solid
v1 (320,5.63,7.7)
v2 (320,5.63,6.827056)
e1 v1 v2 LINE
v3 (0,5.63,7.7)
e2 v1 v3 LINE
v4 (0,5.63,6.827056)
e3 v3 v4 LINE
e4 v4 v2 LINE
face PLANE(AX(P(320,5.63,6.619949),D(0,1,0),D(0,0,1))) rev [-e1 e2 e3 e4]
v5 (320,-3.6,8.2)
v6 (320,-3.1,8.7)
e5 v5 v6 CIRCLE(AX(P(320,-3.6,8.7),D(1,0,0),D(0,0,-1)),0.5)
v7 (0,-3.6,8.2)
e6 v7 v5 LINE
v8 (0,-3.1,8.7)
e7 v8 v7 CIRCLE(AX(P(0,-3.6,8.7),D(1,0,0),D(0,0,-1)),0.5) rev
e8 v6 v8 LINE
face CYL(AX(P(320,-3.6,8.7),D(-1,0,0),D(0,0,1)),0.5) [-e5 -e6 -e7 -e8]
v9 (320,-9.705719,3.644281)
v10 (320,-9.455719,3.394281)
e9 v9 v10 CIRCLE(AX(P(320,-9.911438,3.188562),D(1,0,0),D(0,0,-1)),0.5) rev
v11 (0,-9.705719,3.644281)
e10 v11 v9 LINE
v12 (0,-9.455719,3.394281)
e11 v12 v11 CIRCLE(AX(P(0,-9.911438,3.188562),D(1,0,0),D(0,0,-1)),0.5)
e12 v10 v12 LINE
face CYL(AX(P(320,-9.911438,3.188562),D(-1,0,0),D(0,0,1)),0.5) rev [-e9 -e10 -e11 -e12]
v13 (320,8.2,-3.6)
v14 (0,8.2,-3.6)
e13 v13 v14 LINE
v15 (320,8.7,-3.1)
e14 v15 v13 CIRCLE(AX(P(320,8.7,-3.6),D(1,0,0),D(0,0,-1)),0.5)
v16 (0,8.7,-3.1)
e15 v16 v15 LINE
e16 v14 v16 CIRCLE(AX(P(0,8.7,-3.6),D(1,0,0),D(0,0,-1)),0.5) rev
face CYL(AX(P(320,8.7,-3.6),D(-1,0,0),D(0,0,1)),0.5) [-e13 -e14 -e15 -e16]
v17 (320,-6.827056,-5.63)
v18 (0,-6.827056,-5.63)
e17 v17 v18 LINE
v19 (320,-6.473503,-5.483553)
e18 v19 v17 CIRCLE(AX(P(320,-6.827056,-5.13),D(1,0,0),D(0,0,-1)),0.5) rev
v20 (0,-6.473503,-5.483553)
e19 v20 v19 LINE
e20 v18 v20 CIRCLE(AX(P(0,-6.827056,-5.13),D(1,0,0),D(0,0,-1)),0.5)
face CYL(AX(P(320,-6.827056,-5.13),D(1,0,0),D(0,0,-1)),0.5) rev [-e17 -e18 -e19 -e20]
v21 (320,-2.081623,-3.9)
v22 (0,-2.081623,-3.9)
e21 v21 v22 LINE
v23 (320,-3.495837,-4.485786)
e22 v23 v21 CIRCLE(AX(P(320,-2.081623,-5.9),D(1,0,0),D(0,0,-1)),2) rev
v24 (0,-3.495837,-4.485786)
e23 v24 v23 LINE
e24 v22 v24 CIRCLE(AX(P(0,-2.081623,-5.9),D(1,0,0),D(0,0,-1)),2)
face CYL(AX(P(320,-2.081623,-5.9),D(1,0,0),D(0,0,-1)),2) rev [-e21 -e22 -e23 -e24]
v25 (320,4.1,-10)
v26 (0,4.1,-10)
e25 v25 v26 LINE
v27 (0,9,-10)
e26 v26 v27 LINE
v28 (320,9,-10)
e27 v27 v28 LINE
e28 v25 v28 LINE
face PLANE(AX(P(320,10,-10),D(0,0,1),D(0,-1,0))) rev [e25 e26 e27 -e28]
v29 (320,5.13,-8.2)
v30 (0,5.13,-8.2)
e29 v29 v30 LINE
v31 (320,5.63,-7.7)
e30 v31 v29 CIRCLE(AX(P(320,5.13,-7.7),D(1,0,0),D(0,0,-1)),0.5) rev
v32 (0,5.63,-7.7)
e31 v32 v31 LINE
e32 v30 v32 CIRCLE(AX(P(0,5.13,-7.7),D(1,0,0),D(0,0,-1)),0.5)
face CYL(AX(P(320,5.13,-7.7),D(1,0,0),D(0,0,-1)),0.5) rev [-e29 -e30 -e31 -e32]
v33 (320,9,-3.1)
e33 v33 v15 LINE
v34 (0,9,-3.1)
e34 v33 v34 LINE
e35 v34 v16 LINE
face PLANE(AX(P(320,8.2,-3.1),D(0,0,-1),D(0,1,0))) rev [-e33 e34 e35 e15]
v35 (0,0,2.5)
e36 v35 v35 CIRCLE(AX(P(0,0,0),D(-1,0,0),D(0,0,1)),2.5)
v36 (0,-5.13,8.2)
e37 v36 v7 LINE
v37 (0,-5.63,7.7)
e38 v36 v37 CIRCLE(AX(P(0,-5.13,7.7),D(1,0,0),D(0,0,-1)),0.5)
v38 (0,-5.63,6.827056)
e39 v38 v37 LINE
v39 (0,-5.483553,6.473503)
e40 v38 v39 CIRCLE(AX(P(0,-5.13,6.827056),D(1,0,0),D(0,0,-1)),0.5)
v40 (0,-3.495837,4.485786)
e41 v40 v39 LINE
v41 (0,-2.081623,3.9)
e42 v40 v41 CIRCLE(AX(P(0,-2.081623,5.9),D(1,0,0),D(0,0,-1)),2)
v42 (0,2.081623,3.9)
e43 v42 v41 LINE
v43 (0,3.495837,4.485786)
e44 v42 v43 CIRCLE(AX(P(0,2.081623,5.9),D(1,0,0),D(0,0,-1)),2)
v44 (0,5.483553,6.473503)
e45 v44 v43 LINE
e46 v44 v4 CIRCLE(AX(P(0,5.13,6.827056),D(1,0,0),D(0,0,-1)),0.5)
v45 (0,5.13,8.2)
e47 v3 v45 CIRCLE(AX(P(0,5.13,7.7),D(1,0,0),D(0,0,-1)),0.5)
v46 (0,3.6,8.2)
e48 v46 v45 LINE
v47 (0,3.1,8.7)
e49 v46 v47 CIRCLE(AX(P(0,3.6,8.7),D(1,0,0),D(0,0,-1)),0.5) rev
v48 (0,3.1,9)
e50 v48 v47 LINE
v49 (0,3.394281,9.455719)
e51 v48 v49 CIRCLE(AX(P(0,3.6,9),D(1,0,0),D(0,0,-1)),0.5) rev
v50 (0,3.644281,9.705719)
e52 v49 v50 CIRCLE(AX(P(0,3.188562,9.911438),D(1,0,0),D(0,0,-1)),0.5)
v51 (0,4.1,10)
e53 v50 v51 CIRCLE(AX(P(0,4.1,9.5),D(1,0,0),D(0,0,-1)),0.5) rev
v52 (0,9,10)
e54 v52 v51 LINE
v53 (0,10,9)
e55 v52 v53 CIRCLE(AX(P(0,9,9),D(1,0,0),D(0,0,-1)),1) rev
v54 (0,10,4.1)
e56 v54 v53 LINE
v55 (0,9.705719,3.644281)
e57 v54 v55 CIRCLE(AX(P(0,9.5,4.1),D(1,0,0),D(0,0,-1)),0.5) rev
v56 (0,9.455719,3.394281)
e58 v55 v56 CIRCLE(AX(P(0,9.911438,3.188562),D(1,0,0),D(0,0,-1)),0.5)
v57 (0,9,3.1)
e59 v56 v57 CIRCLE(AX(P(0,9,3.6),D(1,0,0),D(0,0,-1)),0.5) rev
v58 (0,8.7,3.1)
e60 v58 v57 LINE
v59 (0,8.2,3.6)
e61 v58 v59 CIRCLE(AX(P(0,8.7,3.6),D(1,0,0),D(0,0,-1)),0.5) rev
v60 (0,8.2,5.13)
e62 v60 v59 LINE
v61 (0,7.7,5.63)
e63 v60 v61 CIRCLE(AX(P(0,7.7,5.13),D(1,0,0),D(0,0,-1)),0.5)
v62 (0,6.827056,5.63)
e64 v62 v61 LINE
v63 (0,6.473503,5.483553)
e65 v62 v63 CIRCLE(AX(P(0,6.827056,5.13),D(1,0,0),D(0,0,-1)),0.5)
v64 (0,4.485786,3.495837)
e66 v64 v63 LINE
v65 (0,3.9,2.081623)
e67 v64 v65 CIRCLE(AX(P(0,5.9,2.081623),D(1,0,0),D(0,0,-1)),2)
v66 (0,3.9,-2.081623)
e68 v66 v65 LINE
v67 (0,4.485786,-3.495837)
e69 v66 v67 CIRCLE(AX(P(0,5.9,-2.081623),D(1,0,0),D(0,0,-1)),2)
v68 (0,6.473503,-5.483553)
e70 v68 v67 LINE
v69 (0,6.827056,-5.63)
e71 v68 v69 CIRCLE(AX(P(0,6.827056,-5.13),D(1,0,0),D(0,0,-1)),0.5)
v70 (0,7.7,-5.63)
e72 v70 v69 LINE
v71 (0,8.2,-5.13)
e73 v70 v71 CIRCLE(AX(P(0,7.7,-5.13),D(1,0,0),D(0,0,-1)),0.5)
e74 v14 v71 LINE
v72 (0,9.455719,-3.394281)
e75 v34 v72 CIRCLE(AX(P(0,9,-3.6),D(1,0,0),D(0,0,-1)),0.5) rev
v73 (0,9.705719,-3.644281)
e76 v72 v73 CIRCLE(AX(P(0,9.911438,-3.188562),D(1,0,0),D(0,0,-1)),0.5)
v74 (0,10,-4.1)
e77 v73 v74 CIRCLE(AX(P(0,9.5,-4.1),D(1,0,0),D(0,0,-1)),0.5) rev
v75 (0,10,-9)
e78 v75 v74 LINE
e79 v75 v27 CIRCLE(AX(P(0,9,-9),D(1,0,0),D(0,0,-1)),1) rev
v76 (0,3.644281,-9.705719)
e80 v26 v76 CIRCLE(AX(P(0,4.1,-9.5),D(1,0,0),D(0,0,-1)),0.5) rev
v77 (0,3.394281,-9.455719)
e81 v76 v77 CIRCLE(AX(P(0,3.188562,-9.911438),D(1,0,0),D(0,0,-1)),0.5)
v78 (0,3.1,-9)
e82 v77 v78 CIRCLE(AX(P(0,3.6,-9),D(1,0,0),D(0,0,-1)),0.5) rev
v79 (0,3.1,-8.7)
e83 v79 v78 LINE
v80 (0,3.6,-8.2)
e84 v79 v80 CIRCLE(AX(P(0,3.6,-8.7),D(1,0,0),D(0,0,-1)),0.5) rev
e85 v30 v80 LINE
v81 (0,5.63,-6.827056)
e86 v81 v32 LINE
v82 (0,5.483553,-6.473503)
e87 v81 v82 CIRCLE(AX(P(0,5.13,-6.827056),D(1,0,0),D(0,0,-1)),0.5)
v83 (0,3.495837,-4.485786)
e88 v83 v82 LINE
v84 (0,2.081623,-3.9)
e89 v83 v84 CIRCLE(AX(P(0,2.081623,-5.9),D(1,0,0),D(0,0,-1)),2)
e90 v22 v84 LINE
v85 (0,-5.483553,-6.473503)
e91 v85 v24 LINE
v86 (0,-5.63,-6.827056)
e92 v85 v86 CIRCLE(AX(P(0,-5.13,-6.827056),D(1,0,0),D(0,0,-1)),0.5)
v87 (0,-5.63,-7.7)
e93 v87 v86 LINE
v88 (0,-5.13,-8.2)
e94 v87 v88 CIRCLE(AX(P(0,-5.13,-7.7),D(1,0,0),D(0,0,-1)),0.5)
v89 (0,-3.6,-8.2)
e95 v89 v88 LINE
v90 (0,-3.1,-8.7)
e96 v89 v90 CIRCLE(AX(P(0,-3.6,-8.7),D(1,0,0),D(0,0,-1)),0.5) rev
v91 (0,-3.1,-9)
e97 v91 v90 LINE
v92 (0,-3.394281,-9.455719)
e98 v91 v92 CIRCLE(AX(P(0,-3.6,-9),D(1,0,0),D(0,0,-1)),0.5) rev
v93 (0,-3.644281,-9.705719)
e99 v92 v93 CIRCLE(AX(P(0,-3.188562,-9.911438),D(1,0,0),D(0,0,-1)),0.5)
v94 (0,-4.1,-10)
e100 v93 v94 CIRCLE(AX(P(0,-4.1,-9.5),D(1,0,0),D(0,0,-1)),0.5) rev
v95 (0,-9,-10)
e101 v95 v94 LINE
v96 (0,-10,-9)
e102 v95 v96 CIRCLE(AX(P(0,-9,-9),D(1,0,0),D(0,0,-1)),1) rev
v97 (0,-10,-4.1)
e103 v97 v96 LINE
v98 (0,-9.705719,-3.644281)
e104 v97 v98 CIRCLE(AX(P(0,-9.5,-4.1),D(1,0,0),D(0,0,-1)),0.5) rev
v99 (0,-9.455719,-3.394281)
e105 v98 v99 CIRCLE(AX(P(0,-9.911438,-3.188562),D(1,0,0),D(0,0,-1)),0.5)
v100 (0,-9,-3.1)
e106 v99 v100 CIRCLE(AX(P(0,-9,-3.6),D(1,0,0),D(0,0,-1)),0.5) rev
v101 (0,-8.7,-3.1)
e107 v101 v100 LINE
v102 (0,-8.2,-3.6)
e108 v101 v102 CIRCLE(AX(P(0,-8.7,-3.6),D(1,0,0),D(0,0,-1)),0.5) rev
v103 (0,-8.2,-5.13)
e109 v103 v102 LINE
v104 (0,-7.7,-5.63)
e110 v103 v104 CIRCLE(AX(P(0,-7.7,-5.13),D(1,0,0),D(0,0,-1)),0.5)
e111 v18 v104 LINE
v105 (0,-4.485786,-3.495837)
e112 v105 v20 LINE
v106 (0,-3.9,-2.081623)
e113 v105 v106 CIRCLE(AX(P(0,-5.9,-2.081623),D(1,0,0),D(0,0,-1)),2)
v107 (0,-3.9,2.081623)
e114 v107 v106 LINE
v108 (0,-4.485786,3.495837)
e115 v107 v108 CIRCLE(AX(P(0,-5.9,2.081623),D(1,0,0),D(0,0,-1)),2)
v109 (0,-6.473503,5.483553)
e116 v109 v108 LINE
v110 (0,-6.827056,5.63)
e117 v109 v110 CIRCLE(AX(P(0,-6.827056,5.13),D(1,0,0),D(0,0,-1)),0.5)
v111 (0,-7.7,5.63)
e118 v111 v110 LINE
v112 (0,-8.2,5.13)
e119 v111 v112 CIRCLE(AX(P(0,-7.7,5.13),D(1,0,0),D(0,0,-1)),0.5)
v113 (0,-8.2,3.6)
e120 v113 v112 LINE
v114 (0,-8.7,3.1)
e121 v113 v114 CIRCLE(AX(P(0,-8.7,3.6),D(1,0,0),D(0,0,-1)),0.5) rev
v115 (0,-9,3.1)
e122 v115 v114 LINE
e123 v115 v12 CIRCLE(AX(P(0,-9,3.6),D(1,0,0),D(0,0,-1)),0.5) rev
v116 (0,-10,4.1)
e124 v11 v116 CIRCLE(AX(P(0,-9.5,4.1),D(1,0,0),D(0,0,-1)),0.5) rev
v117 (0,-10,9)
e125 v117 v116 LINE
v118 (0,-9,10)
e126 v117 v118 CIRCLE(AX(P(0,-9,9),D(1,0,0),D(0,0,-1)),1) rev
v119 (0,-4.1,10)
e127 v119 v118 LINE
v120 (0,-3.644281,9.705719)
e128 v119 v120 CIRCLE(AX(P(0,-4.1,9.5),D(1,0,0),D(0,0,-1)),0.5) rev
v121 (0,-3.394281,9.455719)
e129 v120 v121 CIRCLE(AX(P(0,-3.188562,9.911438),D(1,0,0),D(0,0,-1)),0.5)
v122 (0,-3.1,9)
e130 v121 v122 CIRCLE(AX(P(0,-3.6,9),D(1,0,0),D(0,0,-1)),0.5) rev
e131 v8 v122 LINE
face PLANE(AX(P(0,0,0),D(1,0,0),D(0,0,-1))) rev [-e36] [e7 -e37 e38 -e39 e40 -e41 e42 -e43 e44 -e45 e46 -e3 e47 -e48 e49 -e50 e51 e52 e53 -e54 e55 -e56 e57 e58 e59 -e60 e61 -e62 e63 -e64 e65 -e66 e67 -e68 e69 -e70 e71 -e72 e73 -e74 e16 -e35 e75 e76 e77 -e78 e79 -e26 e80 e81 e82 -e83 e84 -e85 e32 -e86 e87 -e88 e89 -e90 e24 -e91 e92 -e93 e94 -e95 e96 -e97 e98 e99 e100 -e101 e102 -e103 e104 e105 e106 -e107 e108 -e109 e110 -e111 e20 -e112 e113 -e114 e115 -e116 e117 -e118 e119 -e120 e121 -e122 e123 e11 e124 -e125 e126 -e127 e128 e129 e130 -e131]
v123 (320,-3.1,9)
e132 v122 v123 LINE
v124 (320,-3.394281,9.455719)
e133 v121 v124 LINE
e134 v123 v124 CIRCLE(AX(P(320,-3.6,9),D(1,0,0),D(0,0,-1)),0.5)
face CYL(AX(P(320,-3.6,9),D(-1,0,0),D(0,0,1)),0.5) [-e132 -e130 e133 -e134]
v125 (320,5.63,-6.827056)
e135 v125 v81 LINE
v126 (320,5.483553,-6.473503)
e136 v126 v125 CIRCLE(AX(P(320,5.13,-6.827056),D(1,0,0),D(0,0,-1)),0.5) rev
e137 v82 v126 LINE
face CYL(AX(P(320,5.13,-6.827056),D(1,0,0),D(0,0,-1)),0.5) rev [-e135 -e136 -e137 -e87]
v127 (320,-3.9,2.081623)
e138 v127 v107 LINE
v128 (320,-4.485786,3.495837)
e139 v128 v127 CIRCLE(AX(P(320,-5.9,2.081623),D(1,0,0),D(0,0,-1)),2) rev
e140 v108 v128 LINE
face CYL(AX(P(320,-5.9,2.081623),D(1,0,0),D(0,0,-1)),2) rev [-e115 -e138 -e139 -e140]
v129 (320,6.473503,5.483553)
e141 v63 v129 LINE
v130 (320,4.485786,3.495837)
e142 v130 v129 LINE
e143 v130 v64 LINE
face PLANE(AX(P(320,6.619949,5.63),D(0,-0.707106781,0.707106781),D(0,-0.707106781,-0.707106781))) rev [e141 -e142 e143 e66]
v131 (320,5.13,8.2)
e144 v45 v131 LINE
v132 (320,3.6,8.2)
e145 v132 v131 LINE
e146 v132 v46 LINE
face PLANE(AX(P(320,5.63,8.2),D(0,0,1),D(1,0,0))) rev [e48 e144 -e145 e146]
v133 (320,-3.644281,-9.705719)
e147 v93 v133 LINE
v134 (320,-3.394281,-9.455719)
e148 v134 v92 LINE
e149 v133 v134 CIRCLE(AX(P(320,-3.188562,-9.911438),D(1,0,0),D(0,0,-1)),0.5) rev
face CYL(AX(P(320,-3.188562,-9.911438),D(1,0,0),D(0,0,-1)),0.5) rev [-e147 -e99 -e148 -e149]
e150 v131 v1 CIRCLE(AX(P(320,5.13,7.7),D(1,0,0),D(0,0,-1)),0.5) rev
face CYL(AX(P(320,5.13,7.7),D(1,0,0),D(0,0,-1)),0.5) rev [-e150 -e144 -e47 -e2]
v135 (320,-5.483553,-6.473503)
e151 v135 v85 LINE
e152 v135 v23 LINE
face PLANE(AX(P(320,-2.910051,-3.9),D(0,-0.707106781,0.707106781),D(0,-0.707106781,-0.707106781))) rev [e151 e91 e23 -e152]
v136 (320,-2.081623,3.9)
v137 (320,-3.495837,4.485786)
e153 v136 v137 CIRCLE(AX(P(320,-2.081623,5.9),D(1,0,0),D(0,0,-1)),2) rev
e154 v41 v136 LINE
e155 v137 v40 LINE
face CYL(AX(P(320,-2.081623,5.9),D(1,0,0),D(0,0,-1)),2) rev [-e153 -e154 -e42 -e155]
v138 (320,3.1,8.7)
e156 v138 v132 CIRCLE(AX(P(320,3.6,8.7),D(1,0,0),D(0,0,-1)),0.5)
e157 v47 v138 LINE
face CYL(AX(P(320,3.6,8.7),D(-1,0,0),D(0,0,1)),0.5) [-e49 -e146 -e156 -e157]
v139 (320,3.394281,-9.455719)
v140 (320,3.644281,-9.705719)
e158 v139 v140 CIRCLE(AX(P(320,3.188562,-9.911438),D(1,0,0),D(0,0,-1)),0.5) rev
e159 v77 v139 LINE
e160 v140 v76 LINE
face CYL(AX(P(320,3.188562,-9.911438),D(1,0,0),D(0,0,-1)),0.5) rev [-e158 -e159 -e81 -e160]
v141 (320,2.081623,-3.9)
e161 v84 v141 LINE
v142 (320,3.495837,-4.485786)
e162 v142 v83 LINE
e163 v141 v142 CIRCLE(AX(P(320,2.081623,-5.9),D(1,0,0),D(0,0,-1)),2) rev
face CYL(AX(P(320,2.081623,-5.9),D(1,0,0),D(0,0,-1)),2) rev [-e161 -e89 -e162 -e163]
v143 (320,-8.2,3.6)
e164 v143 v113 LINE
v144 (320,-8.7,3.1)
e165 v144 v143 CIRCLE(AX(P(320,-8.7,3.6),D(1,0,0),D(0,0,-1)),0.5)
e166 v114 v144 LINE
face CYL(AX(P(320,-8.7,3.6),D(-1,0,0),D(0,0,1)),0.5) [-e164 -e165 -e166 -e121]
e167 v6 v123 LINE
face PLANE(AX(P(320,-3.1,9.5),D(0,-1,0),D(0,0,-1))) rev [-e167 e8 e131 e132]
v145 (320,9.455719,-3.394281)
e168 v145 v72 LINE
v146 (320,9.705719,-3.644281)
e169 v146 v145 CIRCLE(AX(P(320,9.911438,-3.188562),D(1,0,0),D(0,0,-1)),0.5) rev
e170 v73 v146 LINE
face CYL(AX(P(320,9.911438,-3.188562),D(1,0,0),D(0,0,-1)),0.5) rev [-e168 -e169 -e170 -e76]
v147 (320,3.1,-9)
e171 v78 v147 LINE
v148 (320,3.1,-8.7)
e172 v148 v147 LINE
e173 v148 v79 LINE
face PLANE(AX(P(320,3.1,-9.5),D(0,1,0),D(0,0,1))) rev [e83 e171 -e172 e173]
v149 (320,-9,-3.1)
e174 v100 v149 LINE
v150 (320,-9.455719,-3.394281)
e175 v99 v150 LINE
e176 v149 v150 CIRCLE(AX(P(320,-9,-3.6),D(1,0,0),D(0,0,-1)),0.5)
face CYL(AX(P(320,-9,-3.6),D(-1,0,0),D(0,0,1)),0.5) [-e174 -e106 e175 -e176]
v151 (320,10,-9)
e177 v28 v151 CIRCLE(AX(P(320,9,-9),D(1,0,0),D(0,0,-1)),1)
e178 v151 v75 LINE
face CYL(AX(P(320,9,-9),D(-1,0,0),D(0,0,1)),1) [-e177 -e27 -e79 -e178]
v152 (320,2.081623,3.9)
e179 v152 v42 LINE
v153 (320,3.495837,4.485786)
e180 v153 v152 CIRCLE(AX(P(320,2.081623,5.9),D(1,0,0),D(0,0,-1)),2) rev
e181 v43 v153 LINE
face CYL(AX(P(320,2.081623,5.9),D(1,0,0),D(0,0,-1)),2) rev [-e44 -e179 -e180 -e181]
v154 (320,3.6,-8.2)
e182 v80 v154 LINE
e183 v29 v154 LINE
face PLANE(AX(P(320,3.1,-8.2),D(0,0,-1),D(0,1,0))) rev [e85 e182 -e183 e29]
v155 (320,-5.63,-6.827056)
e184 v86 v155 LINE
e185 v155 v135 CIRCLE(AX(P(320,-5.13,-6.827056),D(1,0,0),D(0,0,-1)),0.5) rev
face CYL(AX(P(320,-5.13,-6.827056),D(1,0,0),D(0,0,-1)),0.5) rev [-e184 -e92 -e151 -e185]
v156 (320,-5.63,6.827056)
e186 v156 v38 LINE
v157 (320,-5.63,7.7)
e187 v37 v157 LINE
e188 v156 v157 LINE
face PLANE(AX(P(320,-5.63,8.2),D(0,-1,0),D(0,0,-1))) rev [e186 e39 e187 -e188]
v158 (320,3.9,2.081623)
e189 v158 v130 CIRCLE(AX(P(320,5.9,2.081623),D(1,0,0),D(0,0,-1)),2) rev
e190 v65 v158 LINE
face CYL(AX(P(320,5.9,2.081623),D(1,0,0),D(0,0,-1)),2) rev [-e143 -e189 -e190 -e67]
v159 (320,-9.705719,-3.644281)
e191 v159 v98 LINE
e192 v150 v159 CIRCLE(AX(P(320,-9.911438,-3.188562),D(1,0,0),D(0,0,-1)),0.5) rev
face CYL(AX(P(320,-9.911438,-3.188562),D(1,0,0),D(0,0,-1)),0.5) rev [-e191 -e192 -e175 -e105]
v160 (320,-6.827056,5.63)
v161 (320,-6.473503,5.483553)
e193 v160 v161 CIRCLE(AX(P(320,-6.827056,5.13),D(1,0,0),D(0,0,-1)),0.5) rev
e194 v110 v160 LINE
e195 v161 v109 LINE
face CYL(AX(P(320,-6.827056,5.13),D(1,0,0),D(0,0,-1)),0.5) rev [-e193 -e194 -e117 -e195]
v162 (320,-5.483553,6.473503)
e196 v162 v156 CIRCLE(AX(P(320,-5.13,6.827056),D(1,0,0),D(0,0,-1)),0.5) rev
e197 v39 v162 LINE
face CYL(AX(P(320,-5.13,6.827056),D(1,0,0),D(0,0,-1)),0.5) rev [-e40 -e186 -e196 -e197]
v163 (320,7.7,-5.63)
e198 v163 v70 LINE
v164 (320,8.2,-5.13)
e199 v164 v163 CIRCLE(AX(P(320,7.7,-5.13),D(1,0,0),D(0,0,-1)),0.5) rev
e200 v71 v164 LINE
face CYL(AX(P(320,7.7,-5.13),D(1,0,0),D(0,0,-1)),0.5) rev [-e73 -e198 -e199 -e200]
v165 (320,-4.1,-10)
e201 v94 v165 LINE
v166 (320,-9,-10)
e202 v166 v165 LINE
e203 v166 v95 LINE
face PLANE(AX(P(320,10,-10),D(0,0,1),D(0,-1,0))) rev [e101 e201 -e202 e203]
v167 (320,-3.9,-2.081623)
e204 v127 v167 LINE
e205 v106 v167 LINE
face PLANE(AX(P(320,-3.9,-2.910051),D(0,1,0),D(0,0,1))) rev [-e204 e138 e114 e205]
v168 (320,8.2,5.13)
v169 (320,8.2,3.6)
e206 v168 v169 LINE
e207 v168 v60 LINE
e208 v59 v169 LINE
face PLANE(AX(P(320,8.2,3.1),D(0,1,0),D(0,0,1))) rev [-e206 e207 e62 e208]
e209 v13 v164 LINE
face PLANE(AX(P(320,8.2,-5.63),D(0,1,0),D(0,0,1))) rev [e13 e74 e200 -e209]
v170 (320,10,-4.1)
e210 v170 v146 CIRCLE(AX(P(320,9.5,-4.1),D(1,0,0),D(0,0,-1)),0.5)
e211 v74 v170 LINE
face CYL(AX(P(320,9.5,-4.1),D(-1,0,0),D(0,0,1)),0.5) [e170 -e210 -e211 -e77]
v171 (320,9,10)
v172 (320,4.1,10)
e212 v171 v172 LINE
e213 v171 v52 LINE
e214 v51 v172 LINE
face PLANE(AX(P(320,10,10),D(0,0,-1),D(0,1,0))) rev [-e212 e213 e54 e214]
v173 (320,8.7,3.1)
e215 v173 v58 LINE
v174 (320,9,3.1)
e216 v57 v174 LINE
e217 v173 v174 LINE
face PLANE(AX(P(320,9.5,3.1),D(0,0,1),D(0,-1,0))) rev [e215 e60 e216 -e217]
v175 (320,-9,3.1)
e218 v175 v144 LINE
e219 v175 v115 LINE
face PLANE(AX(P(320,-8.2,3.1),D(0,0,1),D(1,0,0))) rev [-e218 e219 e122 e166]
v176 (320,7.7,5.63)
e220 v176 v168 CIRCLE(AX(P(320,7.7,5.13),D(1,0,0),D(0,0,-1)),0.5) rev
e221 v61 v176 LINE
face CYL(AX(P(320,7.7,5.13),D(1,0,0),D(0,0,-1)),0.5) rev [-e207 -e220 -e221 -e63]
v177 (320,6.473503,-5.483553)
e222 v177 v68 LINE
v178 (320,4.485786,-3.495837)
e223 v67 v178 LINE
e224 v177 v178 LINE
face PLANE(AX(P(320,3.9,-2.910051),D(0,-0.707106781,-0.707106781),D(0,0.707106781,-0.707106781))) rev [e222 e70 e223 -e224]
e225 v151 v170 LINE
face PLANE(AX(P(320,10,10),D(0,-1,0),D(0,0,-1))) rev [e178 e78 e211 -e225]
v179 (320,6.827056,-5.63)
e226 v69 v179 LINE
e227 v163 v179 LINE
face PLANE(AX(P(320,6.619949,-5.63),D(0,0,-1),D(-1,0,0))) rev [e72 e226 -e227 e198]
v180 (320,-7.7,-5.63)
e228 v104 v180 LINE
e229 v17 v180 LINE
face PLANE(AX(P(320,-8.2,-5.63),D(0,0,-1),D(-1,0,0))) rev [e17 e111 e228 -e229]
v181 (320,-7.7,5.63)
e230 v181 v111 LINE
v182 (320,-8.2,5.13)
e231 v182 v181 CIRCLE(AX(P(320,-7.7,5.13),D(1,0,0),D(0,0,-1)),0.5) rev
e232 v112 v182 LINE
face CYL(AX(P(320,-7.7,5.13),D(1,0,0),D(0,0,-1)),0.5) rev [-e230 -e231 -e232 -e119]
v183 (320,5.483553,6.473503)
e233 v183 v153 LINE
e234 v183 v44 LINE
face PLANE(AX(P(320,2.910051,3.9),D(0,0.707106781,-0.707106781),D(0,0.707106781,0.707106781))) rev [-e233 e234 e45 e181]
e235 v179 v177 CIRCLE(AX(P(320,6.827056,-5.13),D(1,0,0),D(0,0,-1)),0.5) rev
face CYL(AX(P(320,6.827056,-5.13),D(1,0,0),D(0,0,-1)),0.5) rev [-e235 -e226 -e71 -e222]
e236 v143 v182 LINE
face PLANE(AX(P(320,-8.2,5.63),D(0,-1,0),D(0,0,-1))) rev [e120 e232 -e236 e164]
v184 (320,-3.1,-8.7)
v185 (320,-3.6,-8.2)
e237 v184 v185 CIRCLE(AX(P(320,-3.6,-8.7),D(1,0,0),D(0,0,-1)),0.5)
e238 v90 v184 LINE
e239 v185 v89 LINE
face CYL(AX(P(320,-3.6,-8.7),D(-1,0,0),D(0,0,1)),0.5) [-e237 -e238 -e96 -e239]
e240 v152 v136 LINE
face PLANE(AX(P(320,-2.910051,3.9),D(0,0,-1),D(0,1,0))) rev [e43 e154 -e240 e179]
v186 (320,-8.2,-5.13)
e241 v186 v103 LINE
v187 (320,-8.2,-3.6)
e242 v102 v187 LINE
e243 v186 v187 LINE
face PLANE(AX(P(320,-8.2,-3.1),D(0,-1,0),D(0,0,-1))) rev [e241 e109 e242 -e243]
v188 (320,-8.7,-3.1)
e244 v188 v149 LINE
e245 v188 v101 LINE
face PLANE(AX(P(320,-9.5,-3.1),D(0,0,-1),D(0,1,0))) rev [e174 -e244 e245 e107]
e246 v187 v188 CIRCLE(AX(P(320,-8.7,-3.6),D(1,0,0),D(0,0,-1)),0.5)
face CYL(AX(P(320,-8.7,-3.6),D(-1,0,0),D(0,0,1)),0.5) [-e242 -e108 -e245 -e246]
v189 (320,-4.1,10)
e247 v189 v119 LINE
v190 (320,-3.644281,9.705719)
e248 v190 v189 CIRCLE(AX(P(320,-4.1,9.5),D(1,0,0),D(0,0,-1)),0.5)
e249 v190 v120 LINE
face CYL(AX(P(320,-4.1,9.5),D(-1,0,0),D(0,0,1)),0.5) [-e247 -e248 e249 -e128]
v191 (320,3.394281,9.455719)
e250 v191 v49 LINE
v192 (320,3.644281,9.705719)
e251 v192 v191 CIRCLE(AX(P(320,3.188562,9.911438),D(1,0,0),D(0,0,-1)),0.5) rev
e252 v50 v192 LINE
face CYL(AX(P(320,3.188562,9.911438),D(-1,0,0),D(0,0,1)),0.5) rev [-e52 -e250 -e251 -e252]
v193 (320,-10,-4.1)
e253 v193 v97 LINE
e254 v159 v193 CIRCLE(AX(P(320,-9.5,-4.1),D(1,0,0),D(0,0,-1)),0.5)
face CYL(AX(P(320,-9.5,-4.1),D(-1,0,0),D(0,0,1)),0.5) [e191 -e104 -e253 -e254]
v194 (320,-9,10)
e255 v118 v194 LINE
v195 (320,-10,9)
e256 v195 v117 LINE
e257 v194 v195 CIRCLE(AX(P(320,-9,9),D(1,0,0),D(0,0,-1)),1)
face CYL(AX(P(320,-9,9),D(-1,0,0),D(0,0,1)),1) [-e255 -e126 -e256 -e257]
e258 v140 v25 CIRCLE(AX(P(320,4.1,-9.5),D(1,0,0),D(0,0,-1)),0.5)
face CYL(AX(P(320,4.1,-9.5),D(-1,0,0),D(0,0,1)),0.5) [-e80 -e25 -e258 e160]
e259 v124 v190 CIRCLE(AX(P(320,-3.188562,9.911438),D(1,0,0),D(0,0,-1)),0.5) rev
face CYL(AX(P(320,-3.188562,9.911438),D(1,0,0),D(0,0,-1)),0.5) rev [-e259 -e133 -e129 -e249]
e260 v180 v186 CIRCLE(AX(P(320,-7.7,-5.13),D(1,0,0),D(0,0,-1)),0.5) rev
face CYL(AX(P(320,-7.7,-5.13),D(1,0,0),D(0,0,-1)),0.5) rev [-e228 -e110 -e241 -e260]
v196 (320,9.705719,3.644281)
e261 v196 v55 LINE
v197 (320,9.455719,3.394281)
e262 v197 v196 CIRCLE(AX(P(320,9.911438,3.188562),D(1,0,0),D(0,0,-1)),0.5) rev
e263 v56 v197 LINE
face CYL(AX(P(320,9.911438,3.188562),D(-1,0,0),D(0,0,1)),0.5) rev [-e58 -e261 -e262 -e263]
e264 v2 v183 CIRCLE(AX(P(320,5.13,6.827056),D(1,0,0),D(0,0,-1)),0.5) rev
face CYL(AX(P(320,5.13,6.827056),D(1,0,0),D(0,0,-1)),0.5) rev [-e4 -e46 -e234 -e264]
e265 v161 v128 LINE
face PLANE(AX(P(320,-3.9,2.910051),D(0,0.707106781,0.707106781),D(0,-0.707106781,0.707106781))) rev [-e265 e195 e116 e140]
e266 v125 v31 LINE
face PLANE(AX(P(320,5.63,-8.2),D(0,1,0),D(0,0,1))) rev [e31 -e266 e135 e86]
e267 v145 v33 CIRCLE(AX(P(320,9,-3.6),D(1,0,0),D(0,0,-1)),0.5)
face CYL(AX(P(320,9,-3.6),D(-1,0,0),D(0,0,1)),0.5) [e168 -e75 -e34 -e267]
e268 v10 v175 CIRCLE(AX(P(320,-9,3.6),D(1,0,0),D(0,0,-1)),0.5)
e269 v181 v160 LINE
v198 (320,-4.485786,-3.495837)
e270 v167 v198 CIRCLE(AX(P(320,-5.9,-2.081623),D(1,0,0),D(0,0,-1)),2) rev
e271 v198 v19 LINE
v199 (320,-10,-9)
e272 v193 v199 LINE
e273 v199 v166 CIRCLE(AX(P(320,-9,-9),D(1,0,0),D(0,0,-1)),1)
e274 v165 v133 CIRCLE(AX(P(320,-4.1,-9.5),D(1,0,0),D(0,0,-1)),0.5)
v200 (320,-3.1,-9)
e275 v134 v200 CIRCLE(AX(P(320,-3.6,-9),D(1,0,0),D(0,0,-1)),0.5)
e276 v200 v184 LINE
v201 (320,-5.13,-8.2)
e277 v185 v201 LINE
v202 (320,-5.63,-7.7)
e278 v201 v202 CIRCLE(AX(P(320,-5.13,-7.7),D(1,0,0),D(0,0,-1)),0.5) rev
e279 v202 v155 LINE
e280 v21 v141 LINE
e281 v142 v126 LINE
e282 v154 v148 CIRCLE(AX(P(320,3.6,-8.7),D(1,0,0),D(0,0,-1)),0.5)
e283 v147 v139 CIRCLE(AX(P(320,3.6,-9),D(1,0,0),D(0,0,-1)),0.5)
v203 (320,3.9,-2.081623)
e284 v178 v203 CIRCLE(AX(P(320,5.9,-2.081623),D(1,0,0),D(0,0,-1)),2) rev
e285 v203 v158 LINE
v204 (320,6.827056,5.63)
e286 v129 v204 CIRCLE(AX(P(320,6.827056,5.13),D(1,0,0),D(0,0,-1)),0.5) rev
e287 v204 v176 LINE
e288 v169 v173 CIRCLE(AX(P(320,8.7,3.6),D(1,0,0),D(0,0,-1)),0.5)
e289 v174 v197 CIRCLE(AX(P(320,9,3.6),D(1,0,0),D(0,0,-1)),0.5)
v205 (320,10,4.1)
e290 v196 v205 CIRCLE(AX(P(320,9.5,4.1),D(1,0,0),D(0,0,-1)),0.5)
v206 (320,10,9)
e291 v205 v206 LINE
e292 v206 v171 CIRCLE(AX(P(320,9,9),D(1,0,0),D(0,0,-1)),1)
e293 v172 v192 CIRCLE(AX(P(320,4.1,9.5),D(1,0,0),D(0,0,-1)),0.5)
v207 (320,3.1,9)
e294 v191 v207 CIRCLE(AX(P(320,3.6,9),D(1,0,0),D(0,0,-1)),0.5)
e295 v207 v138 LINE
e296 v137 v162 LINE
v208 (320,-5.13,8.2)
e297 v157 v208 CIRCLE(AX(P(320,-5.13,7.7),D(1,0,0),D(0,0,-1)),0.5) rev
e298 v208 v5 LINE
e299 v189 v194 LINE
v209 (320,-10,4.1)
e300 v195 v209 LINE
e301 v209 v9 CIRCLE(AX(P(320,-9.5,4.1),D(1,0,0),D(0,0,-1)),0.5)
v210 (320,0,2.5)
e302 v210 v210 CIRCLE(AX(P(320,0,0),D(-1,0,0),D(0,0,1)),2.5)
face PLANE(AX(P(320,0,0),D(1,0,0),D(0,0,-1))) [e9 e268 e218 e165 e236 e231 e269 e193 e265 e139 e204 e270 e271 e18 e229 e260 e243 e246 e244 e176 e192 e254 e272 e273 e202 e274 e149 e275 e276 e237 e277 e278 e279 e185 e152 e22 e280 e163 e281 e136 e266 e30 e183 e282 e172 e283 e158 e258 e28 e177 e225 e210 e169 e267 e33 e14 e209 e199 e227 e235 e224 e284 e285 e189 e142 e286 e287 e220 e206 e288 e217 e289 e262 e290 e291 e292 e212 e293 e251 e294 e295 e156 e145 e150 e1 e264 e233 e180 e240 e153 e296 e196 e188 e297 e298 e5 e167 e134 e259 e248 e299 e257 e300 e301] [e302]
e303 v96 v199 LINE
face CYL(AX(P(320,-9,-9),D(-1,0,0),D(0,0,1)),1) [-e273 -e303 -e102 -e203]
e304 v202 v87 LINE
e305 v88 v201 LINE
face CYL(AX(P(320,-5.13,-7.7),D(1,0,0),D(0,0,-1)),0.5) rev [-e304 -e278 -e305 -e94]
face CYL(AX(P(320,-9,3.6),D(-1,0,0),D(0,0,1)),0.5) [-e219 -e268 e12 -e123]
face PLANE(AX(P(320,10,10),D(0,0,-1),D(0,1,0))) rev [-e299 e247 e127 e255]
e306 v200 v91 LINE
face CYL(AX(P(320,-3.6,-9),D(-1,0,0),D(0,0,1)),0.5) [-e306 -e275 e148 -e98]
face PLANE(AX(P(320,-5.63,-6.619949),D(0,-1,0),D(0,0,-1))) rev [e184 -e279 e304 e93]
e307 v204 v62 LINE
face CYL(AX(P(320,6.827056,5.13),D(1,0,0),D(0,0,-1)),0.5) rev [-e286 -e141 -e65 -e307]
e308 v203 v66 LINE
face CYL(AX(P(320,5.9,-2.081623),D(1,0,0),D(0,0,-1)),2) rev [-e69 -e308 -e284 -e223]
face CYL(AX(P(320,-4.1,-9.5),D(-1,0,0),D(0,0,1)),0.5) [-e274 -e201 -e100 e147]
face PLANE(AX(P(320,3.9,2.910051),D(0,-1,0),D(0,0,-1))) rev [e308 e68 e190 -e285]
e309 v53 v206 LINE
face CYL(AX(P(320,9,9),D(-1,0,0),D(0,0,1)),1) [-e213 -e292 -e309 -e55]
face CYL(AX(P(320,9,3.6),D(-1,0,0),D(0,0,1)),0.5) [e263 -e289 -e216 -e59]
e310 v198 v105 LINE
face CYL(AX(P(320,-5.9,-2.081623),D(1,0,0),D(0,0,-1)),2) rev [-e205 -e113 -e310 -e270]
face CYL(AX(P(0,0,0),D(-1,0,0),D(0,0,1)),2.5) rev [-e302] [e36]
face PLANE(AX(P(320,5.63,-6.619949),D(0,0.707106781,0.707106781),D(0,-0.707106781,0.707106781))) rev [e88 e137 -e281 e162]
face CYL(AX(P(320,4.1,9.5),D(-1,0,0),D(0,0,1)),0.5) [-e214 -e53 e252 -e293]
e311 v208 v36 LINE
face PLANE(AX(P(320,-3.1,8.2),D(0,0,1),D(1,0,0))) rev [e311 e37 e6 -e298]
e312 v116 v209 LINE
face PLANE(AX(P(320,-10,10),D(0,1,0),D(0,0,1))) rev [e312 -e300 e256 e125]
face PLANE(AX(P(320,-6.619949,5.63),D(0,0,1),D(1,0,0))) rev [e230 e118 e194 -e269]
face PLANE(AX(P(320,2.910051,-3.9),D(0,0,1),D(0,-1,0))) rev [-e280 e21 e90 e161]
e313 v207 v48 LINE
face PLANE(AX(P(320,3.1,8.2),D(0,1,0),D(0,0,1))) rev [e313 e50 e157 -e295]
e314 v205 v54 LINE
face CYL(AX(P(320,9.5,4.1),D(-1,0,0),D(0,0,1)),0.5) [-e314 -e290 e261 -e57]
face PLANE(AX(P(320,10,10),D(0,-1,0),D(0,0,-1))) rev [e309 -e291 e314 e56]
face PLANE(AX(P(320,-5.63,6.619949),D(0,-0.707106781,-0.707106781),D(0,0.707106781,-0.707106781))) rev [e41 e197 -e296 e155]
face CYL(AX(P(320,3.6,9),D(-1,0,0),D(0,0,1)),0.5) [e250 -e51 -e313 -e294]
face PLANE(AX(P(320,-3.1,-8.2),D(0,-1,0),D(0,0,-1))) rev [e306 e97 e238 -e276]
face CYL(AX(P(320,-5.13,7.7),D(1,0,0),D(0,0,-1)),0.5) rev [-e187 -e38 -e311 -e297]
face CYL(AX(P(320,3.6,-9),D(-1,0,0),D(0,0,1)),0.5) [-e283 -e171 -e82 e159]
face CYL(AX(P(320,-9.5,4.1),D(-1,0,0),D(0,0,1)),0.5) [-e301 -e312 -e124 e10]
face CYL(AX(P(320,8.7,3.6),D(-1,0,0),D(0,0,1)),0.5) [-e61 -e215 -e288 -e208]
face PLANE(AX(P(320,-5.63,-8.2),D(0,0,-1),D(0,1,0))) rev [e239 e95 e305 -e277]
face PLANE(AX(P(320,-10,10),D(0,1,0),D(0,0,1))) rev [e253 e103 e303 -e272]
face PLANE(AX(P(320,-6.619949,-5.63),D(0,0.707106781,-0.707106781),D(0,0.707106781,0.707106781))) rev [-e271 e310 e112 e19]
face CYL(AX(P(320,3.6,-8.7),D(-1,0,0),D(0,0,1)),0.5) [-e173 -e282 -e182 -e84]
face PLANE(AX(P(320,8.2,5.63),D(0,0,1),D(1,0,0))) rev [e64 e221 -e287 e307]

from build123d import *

# Parameters (mm, degrees)
SKETCH1_W                = 20
SKETCH1_H                = 20
BOSS_EXTRUDE1_DEPTH      = 320
FILLET1_R                = 1
CUT_EXTRUDE1_DEPTH       = 321.312347561
F_5_0_5_DIAMETER_HOLE1_D = 5
FILLET2_R                = 2
FILLET3_R                = 0.5
FILLET4_R                = 0.5
FILLET5_R                = 0.5


with BuildPart() as part:
    # Sketch1 → Boss-Extrude1 (new body)
    with BuildSketch(Plane(origin=(0, 0, 0), x_dir=(0, 0, -1), z_dir=(1, 0, 0))):
        Rectangle(SKETCH1_W, SKETCH1_H)
    extrude(amount=BOSS_EXTRUDE1_DEPTH)

    # Fillet1
    fillet1_edges = [part.edges().sort_by_distance(p)[0] for p in [
        (160, 10, 10),
        (160, 10, -10),
        (160, -10, -10),
        (160, -10, 10),
    ]]
    fillet(fillet1_edges, radius=FILLET1_R)

    # Sketch3 → Cut-Extrude1 (cut, through all)
    with BuildSketch(Plane.ZY):
        Polygon((-3.6, 10), (3.6, 10), (3.6, 9.5), (3.1, 9.5), (3.1, 8.2), (5.63, 8.2), (5.63, 6.619949494), (2.910050506, 3.9), (-2.910050506, 3.9), (-5.63, 6.619949494), (-5.63, 8.2), (-3.1, 8.2), (-3.1, 9.5), (-3.6, 9.5), align=None)
        Polygon((10, 3.6), (10, -3.6), (9.5, -3.6), (9.5, -3.1), (8.2, -3.1), (8.2, -5.63), (6.619949494, -5.63), (3.9, -2.910050506), (3.9, 2.910050506), (6.619949494, 5.63), (8.2, 5.63), (8.2, 3.1), (9.5, 3.1), (9.5, 3.6), align=None)
        Polygon((3.6, -10), (-3.6, -10), (-3.6, -9.5), (-3.1, -9.5), (-3.1, -8.2), (-5.63, -8.2), (-5.63, -6.619949494), (-2.910050506, -3.9), (2.910050506, -3.9), (5.63, -6.619949494), (5.63, -8.2), (3.1, -8.2), (3.1, -9.5), (3.6, -9.5), align=None)
        Polygon((-10, -3.6), (-10, 3.6), (-9.5, 3.6), (-9.5, 3.1), (-8.2, 3.1), (-8.2, 5.63), (-6.619949494, 5.63), (-3.9, 2.910050506), (-3.9, -2.910050506), (-6.619949494, -5.63), (-8.2, -5.63), (-8.2, -3.1), (-9.5, -3.1), (-9.5, -3.6), align=None)
    extrude(amount=-CUT_EXTRUDE1_DEPTH, mode=Mode.SUBTRACT)

    # Ø5.0 (5) Diameter Hole1 (through all)
    with Locations(Plane.ZY):
        with Locations((0, 0)):
            Hole(F_5_0_5_DIAMETER_HOLE1_D / 2)

    # Fillet2
    fillet2_edges = [part.edges().sort_by_distance(p)[0] for p in [
        (160, -3.9, -2.910050506),
        (160, -3.9, 2.910050506),
        (160, 2.910050506, -3.9),
        (160, -2.910050506, -3.9),
        (160, -2.910050506, 3.9),
        (160, 2.910050506, 3.9),
        (160, 3.9, 2.910050506),
        (160, 3.9, -2.910050506),
    ]]
    fillet(fillet2_edges, radius=FILLET2_R)

    # Fillet3
    fillet3_edges = [part.edges().sort_by_distance(p)[0] for p in [
        (160, 3.6, -10),
        (160, 3.1, -9.5),
        (160, 3.1, -8.2),
        (160, 5.63, -8.2),
        (160, 5.63, -6.619949494),
        (160, 3.6, 10),
        (160, 3.1, 9.5),
        (160, 3.1, 8.2),
        (160, 5.63, 8.2),
        (160, 5.63, 6.619949494),
        (160, 6.619949494, 5.63),
        (160, 8.2, 5.63),
        (160, 8.2, 3.1),
        (160, 9.5, 3.1),
        (160, 10, 3.6),
        (160, 9.5, -3.1),
        (160, 10, -3.6),
        (160, 8.2, -3.1),
        (160, 8.2, -5.63),
        (160, 6.619949494, -5.63),
    ]]
    fillet(fillet3_edges, radius=FILLET3_R - 0.0001)  # a hair under: the kernel refuses the full size

    # Fillet4
    fillet4_edges = [part.edges().sort_by_distance(p)[0] for p in [
        (160, -3.6, 10),
        (160, -3.1, 9.5),
        (160, -3.1, 8.2),
        (160, -5.63, 8.2),
        (160, -5.63, 6.619949494),
        (160, -6.619949494, 5.63),
        (160, -8.2, 5.63),
        (160, -8.2, 3.1),
        (160, -10, 3.6),
        (160, -9.5, 3.1),
        (160, -10, -3.6),
        (160, -9.5, -3.1),
        (160, -8.2, -3.1),
        (160, -8.2, -5.63),
        (160, -6.619949494, -5.63),
        (160, -5.63, -6.619949494),
        (160, -5.63, -8.2),
        (160, -3.1, -8.2),
        (160, -3.1, -9.5),
        (160, -3.6, -10),
    ]]
    fillet(fillet4_edges, radius=FILLET4_R - 0.0001)  # a hair under: the kernel refuses the full size

    # Fillet5
    fillet5_edges = [part.edges().sort_by_distance(p)[0] for p in [
        (160, 3.6, 9.5),
        (160, 9.5, 3.6),
        (160, 9.5, -3.6),
        (160, 3.6, -9.5),
        (160, -3.6, 9.5),
        (160, -9.5, 3.6),
        (160, -9.5, -3.6),
        (160, -3.6, -9.5),
    ]]
    fillet(fillet5_edges, radius=FILLET5_R)


solid = part.part
